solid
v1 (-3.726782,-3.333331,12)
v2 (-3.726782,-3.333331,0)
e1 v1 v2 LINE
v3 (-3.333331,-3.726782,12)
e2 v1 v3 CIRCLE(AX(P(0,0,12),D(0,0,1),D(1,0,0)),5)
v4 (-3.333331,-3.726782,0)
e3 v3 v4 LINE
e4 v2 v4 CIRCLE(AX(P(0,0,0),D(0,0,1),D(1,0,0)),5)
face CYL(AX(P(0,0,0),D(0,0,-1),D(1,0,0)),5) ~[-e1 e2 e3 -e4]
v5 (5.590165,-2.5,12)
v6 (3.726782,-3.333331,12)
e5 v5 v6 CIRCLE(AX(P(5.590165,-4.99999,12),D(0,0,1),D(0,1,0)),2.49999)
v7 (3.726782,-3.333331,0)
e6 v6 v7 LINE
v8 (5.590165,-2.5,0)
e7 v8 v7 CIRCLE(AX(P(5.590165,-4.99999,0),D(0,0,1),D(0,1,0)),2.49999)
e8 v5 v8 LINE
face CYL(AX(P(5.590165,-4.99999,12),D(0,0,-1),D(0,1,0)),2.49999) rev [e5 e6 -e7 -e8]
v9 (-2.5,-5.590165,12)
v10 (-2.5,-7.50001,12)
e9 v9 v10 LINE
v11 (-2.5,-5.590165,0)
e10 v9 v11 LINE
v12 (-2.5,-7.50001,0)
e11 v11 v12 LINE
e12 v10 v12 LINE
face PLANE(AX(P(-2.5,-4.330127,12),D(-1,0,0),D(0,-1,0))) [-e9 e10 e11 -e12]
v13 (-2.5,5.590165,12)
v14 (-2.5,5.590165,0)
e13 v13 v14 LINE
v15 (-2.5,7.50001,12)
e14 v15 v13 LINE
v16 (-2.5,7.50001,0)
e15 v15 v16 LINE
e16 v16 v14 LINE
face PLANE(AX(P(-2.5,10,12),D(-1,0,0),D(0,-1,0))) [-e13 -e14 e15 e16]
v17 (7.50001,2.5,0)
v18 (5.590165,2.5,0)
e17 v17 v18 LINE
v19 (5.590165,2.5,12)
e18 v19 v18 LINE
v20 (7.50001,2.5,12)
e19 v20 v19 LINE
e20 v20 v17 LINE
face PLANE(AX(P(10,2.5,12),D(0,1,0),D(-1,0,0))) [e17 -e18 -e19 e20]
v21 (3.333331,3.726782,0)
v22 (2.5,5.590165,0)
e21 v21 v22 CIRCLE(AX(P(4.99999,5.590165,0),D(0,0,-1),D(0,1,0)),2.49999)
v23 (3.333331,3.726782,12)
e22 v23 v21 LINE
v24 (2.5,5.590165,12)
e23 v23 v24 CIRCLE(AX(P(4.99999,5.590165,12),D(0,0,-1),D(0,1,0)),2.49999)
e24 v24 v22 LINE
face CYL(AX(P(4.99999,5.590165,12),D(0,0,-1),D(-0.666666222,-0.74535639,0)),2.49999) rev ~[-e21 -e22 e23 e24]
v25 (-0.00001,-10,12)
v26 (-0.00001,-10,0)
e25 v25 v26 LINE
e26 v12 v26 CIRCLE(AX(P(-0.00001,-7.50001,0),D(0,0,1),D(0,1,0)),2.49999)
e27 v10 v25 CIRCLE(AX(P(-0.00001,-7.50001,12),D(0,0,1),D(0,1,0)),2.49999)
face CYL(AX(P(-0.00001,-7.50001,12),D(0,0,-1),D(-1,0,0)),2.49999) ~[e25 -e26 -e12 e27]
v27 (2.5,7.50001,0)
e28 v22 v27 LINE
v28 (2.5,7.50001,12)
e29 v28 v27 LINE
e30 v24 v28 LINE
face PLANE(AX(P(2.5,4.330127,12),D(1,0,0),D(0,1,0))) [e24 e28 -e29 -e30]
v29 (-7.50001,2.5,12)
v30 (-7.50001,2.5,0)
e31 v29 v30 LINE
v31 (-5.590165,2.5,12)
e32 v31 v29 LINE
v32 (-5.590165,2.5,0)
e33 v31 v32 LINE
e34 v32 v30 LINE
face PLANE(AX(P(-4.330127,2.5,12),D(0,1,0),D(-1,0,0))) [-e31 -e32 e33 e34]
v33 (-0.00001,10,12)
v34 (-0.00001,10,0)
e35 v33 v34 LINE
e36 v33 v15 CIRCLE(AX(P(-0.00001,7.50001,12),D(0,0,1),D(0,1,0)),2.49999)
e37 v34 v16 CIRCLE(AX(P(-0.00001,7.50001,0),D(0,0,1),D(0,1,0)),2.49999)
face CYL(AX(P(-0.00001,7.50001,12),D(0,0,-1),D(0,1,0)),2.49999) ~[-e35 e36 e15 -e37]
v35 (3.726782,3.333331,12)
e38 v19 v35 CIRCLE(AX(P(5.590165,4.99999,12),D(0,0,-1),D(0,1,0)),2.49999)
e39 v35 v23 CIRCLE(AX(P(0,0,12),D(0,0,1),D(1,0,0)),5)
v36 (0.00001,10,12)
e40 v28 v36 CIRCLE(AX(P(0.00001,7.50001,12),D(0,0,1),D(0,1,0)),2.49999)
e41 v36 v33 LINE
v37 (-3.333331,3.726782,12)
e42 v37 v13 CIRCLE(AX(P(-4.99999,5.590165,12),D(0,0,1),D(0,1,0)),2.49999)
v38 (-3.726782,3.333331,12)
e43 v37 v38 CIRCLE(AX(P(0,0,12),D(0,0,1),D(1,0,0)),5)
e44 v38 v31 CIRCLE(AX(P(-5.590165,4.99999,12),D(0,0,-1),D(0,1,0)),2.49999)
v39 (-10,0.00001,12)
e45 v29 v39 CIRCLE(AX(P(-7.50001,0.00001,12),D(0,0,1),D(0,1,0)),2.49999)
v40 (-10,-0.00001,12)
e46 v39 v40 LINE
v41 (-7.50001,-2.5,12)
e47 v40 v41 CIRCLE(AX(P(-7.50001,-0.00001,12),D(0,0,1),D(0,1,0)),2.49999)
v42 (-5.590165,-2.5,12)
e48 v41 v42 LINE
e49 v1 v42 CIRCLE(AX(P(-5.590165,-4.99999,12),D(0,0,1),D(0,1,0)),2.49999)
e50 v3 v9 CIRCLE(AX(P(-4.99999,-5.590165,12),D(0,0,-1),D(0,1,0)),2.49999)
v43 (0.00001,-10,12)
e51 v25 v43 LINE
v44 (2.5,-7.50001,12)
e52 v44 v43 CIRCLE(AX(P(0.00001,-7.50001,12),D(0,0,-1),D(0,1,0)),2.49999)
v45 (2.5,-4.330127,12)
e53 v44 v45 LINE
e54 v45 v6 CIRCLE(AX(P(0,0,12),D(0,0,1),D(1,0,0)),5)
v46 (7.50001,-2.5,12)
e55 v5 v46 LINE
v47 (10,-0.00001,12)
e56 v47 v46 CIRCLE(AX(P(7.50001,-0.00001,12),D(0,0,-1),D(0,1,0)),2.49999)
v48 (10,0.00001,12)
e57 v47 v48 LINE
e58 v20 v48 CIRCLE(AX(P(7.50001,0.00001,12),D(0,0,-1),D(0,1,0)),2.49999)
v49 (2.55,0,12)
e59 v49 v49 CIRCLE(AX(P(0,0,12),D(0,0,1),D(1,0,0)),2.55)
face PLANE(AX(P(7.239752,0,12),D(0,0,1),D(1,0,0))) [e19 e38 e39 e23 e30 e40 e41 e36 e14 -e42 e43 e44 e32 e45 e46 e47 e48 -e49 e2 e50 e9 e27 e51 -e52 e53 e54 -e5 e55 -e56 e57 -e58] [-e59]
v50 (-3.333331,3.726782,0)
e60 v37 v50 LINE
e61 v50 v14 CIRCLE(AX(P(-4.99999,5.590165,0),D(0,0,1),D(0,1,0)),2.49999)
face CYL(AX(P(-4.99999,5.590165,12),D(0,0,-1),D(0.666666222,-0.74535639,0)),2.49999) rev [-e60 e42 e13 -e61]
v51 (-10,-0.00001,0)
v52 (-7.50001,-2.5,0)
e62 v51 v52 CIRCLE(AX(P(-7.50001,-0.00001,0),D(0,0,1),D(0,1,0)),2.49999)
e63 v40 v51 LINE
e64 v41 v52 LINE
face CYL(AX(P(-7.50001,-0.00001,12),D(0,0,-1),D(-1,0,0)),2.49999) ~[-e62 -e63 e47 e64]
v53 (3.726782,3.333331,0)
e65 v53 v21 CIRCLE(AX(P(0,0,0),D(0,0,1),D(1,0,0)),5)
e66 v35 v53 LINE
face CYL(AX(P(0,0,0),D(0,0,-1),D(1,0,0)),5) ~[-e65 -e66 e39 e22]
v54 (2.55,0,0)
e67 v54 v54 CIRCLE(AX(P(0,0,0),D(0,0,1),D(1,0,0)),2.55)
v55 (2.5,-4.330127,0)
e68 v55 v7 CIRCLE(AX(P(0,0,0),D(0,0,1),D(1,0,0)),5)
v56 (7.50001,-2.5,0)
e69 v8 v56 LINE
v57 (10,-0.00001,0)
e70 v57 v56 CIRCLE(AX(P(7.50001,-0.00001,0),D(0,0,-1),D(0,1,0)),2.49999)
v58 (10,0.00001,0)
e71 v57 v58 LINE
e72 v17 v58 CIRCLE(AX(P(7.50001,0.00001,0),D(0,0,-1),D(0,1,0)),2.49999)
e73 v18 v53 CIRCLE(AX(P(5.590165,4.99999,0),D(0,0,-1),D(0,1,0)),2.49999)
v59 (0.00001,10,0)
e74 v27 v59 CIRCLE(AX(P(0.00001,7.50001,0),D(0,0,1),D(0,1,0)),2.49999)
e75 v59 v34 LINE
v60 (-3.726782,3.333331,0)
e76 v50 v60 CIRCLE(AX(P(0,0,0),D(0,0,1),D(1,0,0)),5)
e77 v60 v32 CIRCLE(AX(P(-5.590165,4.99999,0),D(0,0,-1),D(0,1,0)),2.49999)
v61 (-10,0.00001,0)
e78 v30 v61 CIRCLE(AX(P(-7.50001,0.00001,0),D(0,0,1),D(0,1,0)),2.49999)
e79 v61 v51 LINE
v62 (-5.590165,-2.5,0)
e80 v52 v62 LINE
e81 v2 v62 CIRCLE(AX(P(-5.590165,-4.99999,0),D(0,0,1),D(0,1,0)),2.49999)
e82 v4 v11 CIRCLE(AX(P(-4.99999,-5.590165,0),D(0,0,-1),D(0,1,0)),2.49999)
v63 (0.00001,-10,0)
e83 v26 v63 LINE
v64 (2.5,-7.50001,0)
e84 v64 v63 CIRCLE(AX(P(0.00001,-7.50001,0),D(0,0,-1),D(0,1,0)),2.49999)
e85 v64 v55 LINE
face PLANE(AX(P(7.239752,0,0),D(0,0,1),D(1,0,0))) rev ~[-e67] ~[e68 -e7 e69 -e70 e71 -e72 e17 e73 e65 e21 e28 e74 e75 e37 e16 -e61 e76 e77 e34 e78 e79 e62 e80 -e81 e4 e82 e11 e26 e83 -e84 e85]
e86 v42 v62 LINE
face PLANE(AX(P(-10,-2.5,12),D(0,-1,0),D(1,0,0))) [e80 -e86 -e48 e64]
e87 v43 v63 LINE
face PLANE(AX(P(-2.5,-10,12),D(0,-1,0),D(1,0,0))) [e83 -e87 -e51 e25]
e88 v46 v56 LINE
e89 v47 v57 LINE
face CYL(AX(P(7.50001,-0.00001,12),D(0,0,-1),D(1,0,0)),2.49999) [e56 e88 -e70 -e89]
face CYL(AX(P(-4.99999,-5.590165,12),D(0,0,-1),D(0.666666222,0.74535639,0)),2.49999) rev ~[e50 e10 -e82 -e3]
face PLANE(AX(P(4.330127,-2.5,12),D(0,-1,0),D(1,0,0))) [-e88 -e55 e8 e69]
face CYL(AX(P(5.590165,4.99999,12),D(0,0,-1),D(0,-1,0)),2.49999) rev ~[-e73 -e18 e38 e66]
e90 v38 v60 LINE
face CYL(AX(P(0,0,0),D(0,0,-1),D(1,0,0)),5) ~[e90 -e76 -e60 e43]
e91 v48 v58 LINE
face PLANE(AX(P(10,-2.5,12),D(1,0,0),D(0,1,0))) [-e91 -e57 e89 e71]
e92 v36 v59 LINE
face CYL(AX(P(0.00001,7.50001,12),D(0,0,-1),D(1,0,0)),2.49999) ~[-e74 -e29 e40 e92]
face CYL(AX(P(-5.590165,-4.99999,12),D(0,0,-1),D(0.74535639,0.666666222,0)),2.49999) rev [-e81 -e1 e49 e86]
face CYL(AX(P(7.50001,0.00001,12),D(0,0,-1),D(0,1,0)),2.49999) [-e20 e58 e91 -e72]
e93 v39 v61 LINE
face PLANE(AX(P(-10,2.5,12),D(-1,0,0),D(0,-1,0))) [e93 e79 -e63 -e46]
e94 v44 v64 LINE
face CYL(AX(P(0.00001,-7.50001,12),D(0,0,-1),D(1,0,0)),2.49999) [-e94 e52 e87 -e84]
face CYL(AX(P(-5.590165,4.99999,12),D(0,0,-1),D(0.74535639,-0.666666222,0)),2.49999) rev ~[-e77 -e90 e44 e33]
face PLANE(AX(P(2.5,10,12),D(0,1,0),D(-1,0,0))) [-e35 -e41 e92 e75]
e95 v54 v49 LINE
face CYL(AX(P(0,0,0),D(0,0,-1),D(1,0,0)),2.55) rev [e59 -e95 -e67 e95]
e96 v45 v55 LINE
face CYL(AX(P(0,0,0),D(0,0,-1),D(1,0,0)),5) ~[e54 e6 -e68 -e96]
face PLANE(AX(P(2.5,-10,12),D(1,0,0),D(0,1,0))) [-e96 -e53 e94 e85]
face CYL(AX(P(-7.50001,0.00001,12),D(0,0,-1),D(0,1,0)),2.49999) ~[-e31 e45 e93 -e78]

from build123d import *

# Parameters (mm, degrees)
F0_R     = 5
F0_R_2   = 2.55
F1_DEPTH = 12
F3_DEPTH = 12
F4_R     = 2.49999


# Not quite as in the source:
# - a fillet or chamfer is up to 0.001 mm smaller than in the source, because OpenCascade refuses the exact size


with BuildPart() as f1:
    # F0 (on Top) → F1 (new body)
    with BuildSketch(Plane.XY):
        Circle(F0_R)
        Circle(F0_R_2, mode=Mode.SUBTRACT)
    extrude(amount=F1_DEPTH)

    # F2 (on face) → F3 (join)
    with BuildSketch(Plane.XY.offset(12)):
        with BuildLine():
            Line((-2.5, 10), (-2.5, 4.3301270189))
            ThreePointArc((-2.5, 4.3301270189), (0, 5), (2.5, 4.3301270189))
            Line((2.5, 4.3301270189), (2.5, 10))
            Line((2.5, 10), (-2.5, 10))
        make_face()
        with BuildLine():
            Line((10, 2.5), (4.3301270189, 2.5))
            ThreePointArc((4.3301270189, 2.5), (4.8296291314, 1.2940952255), (5, 0))
            ThreePointArc((5, 0), (4.8296291314, -1.2940952255), (4.3301270189, -2.5))
            Line((4.3301270189, -2.5), (10, -2.5))
            Line((10, -2.5), (10, 2.5))
        make_face()
        with BuildLine():
            ThreePointArc((2.5, -4.3301270189), (0, -5), (-2.5, -4.3301270189))
            Line((-2.5, -4.3301270189), (-2.5, -10))
            Line((-2.5, -10), (2.5, -10))
            Line((2.5, -10), (2.5, -4.3301270189))
        make_face()
        with BuildLine():
            ThreePointArc((-4.3301270189, -2.5), (-5, 0), (-4.3301270189, 2.5))
            Line((-4.3301270189, 2.5), (-10, 2.5))
            Line((-10, 2.5), (-10, -2.5))
            Line((-10, -2.5), (-4.3301270189, -2.5))
        make_face()
    extrude(amount=-F3_DEPTH)

    # F4 (radius 2.5 in the source; OpenCascade refuses exactly that, so slightly less here)
    f4_edges = [f1.edges().sort_by_distance(p)[0] for p in [
        (2.5, -10, 6),
        (10, -2.5, 6),
        (-10, -2.5, 6),
        (-2.5, -10, 6),
        (-10, 2.5, 6),
        (-2.5, 10, 6),
        (10, 2.5, 6),
        (2.5, 10, 6),
        (2.5, 4.330127, 6),
        (4.330127, 2.5, 6),
        (4.330127, -2.5, 6),
        (-2.5, 4.330127, 6),
        (-4.330127, 2.5, 6),
        (-2.5, -4.330127, 6),
        (-4.330127, -2.5, 6),
    ]]
    fillet(f4_edges, radius=F4_R)


solid = f1.part
